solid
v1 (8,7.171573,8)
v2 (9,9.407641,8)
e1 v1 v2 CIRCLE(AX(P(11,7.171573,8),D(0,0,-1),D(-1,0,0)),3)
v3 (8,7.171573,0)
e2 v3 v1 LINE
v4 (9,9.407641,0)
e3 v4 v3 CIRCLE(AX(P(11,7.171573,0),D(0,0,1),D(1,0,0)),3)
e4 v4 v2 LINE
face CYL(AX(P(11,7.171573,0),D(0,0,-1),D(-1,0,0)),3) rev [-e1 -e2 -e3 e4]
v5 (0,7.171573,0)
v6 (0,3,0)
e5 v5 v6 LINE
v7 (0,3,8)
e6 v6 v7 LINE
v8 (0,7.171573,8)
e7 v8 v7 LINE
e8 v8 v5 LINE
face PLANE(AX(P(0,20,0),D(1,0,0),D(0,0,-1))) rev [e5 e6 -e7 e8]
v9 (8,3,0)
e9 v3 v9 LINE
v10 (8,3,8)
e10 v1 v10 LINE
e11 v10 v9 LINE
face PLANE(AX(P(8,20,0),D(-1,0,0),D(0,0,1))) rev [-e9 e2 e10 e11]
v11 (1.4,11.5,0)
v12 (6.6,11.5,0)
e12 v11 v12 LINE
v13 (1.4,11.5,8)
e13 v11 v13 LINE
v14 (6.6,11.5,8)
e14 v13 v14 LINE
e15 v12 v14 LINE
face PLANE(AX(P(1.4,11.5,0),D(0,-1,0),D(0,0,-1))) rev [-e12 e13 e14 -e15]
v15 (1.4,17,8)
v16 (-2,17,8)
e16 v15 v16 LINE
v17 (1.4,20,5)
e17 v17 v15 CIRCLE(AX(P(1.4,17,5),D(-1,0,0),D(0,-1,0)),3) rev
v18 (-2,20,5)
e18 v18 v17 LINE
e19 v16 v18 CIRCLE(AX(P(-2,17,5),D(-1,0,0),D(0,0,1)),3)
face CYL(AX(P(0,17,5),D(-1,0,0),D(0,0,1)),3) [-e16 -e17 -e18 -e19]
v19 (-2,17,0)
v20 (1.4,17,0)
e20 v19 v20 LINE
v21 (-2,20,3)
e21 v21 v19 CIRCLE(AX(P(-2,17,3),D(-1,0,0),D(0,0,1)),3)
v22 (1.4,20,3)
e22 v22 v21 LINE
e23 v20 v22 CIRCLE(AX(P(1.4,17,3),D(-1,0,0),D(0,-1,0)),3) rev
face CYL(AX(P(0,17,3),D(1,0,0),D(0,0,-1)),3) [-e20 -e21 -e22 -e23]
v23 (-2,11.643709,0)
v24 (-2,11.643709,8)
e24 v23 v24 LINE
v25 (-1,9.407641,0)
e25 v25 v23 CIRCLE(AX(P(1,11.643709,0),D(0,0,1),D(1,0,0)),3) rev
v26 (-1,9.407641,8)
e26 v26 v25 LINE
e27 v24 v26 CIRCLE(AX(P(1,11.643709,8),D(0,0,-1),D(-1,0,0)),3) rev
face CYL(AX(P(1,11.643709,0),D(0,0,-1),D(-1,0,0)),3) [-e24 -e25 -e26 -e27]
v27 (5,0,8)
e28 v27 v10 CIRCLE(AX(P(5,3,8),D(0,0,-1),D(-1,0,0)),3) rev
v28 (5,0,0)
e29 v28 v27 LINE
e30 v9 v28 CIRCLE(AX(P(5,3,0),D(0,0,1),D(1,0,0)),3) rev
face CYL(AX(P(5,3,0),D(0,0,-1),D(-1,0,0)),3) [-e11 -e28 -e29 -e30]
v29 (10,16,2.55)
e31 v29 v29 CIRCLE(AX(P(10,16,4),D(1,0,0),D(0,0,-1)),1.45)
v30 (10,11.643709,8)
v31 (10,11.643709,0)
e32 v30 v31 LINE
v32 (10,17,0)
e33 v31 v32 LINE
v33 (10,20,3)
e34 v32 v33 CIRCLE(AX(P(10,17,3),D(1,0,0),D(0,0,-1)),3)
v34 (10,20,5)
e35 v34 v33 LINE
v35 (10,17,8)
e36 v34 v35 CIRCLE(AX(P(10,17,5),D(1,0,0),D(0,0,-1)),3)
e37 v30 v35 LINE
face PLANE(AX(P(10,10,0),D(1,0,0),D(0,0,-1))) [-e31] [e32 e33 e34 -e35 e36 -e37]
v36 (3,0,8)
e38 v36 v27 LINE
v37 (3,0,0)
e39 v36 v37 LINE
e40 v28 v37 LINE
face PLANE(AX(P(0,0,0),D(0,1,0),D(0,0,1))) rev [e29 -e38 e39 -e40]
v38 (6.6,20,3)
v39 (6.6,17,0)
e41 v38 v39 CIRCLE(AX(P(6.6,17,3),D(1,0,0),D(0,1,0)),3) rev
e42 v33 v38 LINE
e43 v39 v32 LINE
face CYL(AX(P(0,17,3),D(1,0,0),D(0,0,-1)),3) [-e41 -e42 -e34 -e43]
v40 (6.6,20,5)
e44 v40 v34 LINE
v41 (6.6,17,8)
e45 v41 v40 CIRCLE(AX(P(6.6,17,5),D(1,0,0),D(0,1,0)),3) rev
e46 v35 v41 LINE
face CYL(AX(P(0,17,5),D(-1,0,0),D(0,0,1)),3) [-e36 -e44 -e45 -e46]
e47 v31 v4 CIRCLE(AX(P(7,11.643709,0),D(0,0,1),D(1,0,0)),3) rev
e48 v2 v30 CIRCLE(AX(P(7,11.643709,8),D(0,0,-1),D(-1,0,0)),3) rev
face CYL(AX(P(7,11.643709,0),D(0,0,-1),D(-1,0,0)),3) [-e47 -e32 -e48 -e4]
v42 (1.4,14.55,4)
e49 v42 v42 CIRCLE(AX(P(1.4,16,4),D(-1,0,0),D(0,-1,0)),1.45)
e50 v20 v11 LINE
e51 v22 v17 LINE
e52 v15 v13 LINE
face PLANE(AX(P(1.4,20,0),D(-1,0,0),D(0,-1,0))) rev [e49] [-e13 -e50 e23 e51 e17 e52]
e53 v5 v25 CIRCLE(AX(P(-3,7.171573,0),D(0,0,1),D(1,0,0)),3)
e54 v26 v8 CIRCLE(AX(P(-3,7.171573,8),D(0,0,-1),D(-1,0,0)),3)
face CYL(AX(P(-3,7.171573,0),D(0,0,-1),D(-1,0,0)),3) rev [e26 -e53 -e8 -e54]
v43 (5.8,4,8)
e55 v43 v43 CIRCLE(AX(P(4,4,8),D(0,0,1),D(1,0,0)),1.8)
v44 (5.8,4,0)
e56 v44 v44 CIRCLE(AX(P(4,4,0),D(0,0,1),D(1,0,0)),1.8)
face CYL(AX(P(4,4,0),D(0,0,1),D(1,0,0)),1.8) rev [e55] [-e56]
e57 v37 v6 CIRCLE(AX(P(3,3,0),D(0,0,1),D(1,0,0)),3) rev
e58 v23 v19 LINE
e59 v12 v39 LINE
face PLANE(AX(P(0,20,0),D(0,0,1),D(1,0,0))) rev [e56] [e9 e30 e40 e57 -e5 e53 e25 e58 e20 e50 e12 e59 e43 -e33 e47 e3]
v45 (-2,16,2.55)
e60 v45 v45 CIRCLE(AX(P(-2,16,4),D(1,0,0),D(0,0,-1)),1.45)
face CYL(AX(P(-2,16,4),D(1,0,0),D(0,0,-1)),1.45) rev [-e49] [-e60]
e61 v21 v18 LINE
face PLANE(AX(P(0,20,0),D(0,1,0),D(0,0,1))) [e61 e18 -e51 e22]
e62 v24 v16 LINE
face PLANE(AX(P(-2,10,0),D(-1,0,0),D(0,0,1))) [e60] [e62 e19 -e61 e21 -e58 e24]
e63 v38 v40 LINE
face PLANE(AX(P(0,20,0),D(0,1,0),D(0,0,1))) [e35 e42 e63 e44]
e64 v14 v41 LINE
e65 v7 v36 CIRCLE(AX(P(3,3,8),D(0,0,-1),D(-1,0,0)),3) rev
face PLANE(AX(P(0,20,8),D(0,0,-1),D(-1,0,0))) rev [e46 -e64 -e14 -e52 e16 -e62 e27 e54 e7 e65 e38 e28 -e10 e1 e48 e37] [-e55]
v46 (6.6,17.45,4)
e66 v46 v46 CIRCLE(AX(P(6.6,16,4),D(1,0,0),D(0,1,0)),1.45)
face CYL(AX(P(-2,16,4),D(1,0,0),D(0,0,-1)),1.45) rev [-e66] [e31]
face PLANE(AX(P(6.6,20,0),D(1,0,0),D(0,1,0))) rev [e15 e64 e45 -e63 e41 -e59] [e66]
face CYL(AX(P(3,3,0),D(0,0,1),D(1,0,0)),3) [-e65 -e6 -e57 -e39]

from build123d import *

# Parameters (mm, degrees)
SKETCH_1_W          = 8
SKETCH_1_H          = 8
EXTRUDE_1_DEPTH     = 20
SKETCH_2_R          = 1.8
CUT_EXTRUDE_1_DEPTH = 23.978250586
SKETCH_4_W          = 2
SKETCH_4_H          = 8
EXTRUDE_3_DEPTH     = 10
SKETCH_5_W          = 5.2
SKETCH_5_H          = 8.5
CUT_EXTRUDE_2_DEPTH = 24.748684174
FILLET_1_R          = 3
SKETCH_6_R          = 1.45
CUT_EXTRUDE_3_DEPTH = 25.657656012
FILLET_2_R          = 3


with BuildPart() as part:
    # 草图1 → 凸台-拉伸1 (new body)
    with BuildSketch(Plane(origin=(0, 0, 0), x_dir=(1, 0, 0), z_dir=(0, 1, 0))):
        with Locations((4, -4)):
            Rectangle(SKETCH_1_W, SKETCH_1_H)
    extrude(amount=EXTRUDE_1_DEPTH)

    # 草图2 → 切除-拉伸1 (cut, through all)
    with BuildSketch(Plane.XY.offset(8)):
        with Locations((4, 4)):
            Circle(SKETCH_2_R)
    extrude(amount=-CUT_EXTRUDE_1_DEPTH, mode=Mode.SUBTRACT)

    # 草图4 → 凸台-拉伸3 (add)
    with BuildSketch(Plane(origin=(0, 20, 0), x_dir=(1, 0, 0), z_dir=(0, 1, 0))):
        with Locations((-1, -4)):
            Rectangle(SKETCH_4_W, SKETCH_4_H)
        with Locations((9, -4)):
            Rectangle(SKETCH_4_W, SKETCH_4_H)
    extrude(amount=-EXTRUDE_3_DEPTH)

    # 草图5 → 切除-拉伸2 (cut, through all)
    with BuildSketch(Plane.XY.offset(8)):
        with Locations((4, 15.75)):
            Rectangle(SKETCH_5_W, SKETCH_5_H)
    extrude(amount=-CUT_EXTRUDE_2_DEPTH, mode=Mode.SUBTRACT)

    # 圆角1
    # the kernel refuses this fillet: 3 mm, written as the material it adds along each edge
    with BuildSketch(Plane(origin=(8, 10, 8), x_dir=(0, -1, 0), z_dir=(0, 0, -1))) as fillet_1_piece_1:
        with BuildLine():
            CenterArc((2.828427125, -3), FILLET_1_R, 90, 70.528779366)
            Line((0, -2), (-0.056568542, -1.98))
            ThreePointArc((-0.056568542, -1.98), (-0.06, -1), (-0.06, 0))
            Line((-0.06, 0), (0, 0.06))
            Line((0, 0.06), (2.828427125, 0.06))
            Line((2.828427125, 0.06), (2.828427125, 0))
        make_face()
    extrude(amount=8)
    with BuildSketch(Plane(origin=(0, 10, 8), x_dir=(-1, 0, 0), z_dir=(0, 0, -1))) as fillet_1_piece_2:
        with BuildLine():
            CenterArc((3, -2.828427125), FILLET_1_R, 109.471220634, 70.528779366)
            Line((0, -2.828427125), (-0.06, -2.828427125))
            Line((-0.06, -2.828427125), (-0.06, 0))
            Line((-0.06, 0), (0, 0.06))
            ThreePointArc((0, 0.06), (1, 0.06), (1.98, 0.056568542))
            Line((1.98, 0.056568542), (2, 0))
        make_face()
    extrude(amount=8)

    # 草图6 → 切除-拉伸3 (cut, through all)
    with BuildSketch(Plane(origin=(10, 0, 0), x_dir=(0, 0, -1), z_dir=(1, 0, 0))):
        with Locations((-4, 16)):
            Circle(SKETCH_6_R)
    extrude(amount=-CUT_EXTRUDE_3_DEPTH, mode=Mode.SUBTRACT)

    # 圆角2
    fillet_2_edges = [part.edges().sort_by_distance(p)[0] for p in [
        (8.3, 20, 0),
        (-2, 10, 4),
        (10, 10, 4),
        (-0.3, 20, 0),
        (8.3, 20, 8),
        (8, 0, 4),
        (0, 0, 4),
        (-0.3, 20, 8),
    ]]
    fillet(fillet_2_edges, radius=FILLET_2_R)


solid = part.part
